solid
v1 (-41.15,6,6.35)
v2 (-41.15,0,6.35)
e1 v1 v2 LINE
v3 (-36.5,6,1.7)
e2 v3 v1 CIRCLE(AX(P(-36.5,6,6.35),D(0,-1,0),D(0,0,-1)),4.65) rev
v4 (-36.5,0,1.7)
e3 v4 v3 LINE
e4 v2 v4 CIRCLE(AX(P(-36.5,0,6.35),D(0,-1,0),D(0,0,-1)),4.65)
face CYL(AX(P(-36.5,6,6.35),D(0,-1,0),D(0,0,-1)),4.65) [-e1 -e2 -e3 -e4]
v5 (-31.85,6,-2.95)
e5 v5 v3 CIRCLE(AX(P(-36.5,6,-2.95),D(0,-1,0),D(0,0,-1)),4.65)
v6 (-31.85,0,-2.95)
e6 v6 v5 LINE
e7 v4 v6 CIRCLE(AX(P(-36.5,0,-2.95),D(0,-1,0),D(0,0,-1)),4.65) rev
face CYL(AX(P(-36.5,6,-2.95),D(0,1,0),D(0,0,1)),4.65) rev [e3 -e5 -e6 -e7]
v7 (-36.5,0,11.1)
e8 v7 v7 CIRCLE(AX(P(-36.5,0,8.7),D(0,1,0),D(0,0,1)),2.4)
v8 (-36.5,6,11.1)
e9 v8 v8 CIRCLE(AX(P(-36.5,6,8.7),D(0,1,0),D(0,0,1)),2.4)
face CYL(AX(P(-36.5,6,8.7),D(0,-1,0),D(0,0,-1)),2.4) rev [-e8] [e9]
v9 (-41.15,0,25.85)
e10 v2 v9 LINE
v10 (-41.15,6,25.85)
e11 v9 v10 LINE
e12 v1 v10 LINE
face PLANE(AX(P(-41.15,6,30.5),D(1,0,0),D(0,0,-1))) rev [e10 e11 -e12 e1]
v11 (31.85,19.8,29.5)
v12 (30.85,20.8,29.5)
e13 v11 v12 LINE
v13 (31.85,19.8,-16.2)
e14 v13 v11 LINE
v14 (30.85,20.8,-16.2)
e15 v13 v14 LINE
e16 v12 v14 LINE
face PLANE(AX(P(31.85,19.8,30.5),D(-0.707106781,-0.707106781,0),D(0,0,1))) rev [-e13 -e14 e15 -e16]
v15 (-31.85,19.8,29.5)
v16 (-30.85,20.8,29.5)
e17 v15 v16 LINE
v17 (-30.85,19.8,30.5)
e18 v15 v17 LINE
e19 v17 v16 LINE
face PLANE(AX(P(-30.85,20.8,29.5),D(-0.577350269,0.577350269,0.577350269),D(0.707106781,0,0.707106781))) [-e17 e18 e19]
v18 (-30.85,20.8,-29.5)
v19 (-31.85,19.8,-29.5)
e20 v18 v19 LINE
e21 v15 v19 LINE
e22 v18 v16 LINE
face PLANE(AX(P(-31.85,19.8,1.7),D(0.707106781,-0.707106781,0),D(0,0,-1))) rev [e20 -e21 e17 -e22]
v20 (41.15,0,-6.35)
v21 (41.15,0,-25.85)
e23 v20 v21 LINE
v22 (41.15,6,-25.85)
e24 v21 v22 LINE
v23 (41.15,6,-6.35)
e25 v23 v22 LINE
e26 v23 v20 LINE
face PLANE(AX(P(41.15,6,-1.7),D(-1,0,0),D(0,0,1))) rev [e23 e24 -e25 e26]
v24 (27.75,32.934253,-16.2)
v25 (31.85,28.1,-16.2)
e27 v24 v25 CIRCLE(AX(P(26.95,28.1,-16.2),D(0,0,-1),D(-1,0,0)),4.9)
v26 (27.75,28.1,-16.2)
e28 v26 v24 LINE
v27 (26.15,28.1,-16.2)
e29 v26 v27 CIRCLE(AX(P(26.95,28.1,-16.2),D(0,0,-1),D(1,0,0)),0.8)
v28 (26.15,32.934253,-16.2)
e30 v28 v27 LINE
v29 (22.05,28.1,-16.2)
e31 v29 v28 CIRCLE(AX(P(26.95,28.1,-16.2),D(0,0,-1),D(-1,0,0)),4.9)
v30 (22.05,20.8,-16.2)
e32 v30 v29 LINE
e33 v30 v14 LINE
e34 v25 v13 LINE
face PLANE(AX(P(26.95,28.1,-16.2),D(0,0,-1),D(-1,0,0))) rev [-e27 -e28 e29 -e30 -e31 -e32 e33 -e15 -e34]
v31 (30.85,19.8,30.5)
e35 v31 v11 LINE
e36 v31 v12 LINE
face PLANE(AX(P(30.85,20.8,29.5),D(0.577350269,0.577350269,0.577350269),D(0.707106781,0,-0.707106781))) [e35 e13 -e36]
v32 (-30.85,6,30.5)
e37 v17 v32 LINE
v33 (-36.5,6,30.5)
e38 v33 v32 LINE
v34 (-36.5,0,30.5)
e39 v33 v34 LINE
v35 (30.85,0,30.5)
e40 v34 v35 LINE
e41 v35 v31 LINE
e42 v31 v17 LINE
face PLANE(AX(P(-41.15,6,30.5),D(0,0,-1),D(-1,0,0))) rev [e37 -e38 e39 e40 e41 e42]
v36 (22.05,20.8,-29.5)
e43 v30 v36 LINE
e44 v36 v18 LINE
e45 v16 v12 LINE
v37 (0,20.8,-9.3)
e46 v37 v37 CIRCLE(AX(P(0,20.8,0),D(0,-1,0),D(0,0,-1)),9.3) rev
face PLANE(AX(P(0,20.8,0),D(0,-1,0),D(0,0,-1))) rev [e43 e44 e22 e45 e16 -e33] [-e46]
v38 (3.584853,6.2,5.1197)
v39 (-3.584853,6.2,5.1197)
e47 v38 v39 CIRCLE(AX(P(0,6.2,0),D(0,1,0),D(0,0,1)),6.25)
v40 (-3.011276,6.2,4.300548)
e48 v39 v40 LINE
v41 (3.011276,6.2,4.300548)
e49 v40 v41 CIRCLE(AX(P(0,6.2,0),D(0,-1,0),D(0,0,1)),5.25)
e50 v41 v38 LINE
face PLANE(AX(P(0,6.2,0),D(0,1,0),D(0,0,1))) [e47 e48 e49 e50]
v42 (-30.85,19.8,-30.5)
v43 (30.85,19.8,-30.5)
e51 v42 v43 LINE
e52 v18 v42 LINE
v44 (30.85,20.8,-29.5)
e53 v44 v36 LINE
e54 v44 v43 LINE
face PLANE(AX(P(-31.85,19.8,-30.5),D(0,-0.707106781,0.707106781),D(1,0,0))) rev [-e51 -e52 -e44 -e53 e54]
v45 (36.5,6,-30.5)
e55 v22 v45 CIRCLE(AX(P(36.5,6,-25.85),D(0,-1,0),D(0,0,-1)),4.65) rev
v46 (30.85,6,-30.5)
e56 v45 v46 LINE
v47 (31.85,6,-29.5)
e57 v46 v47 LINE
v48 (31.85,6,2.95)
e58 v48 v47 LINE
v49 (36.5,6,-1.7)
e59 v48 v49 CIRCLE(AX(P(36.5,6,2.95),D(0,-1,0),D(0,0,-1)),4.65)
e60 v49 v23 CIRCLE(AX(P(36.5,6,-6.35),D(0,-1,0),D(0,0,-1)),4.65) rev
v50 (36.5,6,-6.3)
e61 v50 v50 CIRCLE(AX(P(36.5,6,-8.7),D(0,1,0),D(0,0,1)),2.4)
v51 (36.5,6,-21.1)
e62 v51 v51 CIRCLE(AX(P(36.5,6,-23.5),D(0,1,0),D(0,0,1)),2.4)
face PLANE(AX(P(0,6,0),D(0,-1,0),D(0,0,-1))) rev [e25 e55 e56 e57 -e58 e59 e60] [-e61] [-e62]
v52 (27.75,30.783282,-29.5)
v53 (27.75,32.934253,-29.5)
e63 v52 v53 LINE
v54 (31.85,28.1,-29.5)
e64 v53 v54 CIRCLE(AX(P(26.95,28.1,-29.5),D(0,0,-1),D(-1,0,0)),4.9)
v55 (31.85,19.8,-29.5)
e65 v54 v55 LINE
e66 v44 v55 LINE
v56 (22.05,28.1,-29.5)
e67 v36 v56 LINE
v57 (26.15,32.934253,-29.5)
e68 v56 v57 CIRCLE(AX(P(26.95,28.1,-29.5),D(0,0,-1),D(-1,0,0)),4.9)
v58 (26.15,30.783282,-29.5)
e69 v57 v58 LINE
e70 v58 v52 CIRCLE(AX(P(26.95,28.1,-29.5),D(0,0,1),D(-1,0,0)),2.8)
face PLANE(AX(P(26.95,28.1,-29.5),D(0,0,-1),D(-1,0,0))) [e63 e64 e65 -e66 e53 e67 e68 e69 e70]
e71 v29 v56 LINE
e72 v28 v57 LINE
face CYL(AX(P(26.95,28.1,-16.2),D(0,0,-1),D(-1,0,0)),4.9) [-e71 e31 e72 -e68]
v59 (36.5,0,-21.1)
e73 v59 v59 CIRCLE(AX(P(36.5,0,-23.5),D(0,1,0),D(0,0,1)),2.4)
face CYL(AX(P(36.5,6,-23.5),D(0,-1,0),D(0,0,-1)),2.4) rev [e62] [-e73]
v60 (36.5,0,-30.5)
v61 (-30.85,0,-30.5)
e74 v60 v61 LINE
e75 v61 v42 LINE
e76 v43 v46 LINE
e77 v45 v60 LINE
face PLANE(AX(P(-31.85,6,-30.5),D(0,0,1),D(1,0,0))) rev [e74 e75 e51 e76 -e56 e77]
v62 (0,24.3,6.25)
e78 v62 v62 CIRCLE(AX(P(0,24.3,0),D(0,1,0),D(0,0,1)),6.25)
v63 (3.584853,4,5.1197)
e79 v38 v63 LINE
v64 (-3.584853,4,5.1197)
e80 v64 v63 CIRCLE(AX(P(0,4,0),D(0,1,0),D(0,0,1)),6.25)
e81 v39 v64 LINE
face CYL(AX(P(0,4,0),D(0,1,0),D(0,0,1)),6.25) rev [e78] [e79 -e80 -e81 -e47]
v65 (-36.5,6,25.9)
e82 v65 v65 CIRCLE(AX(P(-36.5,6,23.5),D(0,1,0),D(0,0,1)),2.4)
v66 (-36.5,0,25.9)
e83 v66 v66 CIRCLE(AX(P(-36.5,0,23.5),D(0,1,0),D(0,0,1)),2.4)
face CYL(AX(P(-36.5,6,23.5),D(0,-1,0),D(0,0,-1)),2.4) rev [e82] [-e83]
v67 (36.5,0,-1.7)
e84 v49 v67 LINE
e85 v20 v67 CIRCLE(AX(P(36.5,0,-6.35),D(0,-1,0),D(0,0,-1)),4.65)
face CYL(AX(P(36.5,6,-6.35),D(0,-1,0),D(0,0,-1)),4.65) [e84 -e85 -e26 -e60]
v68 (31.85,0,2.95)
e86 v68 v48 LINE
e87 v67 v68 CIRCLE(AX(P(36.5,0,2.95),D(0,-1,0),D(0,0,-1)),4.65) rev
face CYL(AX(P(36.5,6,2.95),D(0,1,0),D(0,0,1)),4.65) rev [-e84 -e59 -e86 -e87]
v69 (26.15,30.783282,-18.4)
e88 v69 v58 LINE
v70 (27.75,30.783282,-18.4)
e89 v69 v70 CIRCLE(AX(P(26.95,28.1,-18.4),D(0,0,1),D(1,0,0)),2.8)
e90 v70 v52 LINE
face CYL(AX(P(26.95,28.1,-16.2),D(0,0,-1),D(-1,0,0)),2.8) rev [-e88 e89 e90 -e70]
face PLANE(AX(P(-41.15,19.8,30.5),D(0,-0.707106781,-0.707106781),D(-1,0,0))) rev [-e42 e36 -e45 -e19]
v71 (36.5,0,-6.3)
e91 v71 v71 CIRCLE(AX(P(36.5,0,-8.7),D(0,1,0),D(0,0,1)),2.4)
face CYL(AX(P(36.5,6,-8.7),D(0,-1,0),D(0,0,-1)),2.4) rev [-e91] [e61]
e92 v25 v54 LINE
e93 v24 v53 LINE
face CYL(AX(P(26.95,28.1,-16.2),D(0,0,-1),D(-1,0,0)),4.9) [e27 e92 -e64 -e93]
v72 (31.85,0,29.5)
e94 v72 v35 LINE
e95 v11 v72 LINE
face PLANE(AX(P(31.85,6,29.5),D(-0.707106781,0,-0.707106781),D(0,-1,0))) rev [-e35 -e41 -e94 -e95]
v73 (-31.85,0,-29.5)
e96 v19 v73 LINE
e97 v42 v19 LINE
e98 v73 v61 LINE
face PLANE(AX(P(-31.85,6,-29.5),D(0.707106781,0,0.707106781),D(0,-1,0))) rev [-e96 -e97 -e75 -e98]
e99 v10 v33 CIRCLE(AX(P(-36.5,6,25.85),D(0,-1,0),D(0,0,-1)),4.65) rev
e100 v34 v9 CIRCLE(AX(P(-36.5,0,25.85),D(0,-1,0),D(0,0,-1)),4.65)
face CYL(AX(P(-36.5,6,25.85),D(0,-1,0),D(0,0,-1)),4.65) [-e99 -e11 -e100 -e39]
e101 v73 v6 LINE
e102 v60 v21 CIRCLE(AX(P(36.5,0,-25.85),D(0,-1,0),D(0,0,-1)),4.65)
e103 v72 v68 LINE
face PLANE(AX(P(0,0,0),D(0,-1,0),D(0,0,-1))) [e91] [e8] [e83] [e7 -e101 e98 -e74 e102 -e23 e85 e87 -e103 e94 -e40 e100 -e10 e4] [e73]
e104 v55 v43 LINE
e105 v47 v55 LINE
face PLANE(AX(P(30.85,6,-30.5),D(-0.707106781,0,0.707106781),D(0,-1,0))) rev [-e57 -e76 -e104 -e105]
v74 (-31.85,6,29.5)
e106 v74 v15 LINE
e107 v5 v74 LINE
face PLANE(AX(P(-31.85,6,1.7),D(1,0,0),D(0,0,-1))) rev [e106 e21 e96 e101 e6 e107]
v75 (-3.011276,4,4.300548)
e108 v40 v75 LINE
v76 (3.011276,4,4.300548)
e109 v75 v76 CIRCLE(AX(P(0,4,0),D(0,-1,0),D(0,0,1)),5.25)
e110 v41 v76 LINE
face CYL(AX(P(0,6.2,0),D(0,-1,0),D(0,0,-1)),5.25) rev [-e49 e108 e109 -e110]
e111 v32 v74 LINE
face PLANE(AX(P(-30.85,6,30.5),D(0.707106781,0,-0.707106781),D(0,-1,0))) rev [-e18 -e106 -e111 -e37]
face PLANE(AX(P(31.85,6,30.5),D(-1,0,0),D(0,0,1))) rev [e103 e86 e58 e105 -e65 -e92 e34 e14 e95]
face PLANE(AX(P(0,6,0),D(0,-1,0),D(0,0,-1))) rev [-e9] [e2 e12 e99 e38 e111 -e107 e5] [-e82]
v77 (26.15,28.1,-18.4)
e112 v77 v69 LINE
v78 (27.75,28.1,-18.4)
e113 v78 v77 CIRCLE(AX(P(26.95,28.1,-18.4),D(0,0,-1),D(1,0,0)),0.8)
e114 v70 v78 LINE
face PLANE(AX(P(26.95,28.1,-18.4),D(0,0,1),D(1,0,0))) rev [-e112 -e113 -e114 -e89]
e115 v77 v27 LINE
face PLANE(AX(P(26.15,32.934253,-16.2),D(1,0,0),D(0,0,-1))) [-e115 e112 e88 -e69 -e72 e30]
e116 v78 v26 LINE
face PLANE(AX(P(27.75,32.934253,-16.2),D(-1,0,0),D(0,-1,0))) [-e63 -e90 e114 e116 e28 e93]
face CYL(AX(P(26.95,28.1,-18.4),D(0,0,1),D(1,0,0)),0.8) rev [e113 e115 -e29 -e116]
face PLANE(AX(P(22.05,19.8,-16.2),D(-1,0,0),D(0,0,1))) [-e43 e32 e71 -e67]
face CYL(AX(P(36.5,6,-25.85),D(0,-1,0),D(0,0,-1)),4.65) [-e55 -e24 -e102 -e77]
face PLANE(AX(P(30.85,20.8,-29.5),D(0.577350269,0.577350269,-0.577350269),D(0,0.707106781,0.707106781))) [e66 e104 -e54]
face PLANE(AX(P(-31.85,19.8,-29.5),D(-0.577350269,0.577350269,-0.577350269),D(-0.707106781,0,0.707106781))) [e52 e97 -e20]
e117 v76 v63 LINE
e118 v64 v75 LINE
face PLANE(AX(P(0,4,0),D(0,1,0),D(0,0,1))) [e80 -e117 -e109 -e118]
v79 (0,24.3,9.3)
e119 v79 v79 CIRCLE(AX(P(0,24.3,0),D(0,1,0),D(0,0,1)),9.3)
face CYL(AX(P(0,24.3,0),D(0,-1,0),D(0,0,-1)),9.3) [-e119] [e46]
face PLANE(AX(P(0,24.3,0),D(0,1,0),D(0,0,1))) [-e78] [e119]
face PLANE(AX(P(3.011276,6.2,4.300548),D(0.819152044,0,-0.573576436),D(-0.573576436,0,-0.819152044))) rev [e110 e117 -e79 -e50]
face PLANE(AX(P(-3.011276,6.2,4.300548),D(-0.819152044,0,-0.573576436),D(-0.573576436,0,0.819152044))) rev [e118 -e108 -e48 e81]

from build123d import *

# Parameters (mm, degrees)
ESBO_O1_R                = 2.4
RESSALTO_EXTRUS_O1_DEPTH = 6
ESBO_O2_W                = 63.7
ESBO_O2_H                = 61
RESSALTO_EXTRUS_O2_DEPTH = 14.8
CHANFRO1_SIZE            = 1
ESBO_O3_R                = 6.25
CORTE_EXTRUS_O1_DEPTH    = 16.8
FILETE1_R                = 4.65
RESSALTO_EXTRUS_O4_DEPTH = 13.3
RESSALTO_EXTRUS_O5_START = -2.2
RESSALTO_EXTRUS_O5_DEPTH = 2.2
RESSALTO_EXTRUS_O6_START = 2.2
RESSALTO_EXTRUS_O6_DEPTH = 2.2
RESSALTO_EXTRUS_O7_START = 3.5
ESBO_O7_R                = 9.3
ESBO_O7_R_2              = 6.25
RESSALTO_EXTRUS_O7_DEPTH = 3.5


with BuildPart() as part:
    # Esboço1 → Ressalto-extrusão1 (new body)
    with BuildSketch(Plane(origin=(0, 0, 0), x_dir=(1, 0, 0), z_dir=(0, 1, 0))):
        Polygon((-41.15, -1.7), (-31.85, -1.7), (-31.85, 30.5), (41.15, 30.5), (41.15, 1.7), (31.85, 1.7), (31.85, -30.5), (-41.15, -30.5), align=None)
        with Locations(Location((-36.5, -8.7, 0), (0, 0, 270))):
            Circle(ESBO_O1_R, mode=Mode.SUBTRACT)
        with Locations(Location((-36.5, -23.5, 0), (0, 0, 270))):
            Circle(ESBO_O1_R, mode=Mode.SUBTRACT)
        with Locations(Location((36.5, 8.7, 0), (0, 0, 270))):
            Circle(ESBO_O1_R, mode=Mode.SUBTRACT)
        with Locations(Location((36.5, 23.5, 0), (0, 0, 270))):
            Circle(ESBO_O1_R, mode=Mode.SUBTRACT)
    extrude(amount=RESSALTO_EXTRUS_O1_DEPTH)

    # Esboço2 → Ressalto-extrusão2 (add)
    with BuildSketch(Plane(origin=(0, 6, 0), x_dir=(1, 0, 0), z_dir=(0, 1, 0))):
        Rectangle(ESBO_O2_W, ESBO_O2_H)
    extrude(amount=RESSALTO_EXTRUS_O2_DEPTH)

    # Chanfro1
    chanfro1_edges = [part.edges().sort_by_distance(p)[0] for p in [
        (31.85, 10.4, 30.5),
        (-31.85, 10.4, -30.5),
        (0, 20.8, -30.5),
        (31.85, 13.4, -30.5),
        (31.85, 20.8, 0),
        (0, 20.8, 30.5),
        (-31.85, 13.4, 30.5),
        (-31.85, 20.8, 0),
    ]]
    chamfer(chanfro1_edges, length=CHANFRO1_SIZE)

    # Esboço3 → Corte-extrusão1 (cut)
    with BuildSketch(Plane(origin=(0, 20.8, 0), x_dir=(1, 0, 0), z_dir=(0, 1, 0))):
        with Locations(Location((0, 0, 0), (0, 0, 270))):
            Circle(ESBO_O3_R)
    extrude(amount=-CORTE_EXTRUS_O1_DEPTH, mode=Mode.SUBTRACT)

    # Filete1
    filete1_edges = [part.edges().sort_by_distance(p)[0] for p in [
        (41.15, 3, -30.5),
        (41.15, 3, -1.7),
        (31.85, 3, -1.7),
        (-31.85, 3, 1.7),
        (-41.15, 3, 1.7),
        (-41.15, 3, 30.5),
    ]]
    fillet(filete1_edges, radius=FILETE1_R - 0.0001)  # a hair under: the kernel refuses the full size

    # Esboço4 → Ressalto-extrusão4 (add)
    with BuildSketch(Plane(origin=(0, 0, -29.5), x_dir=(-1, 0, 0), z_dir=(0, 0, -1))):
        with BuildLine():
            Line((-31.85, 19.8), (-22.05, 19.8))
            Line((-22.05, 19.8), (-22.05, 28.1))
            ThreePointArc((-22.05, 28.1), (-23.213022612, 31.269384798), (-26.15, 32.934252786))
            Line((-26.15, 32.934252786), (-26.15, 30.783281573))
            ThreePointArc((-26.15, 30.783281573), (-26.95, 25.3), (-27.75, 30.783281573))
            Line((-27.75, 30.783281573), (-27.75, 32.934252786))
            ThreePointArc((-27.75, 32.934252786), (-30.686977388, 31.269384798), (-31.85, 28.1))
            Line((-31.85, 28.1), (-31.85, 19.8))
        make_face()
    extrude(amount=-RESSALTO_EXTRUS_O4_DEPTH)

    # Esboço5 → Ressalto-extrusão5 (add)
    with BuildSketch(Plane.XY.offset(-16.2).offset(RESSALTO_EXTRUS_O5_START)):
        with BuildLine():
            Line((26.15, 30.783281573), (26.15, 28.1))
            ThreePointArc((26.15, 28.1), (26.95, 27.3), (27.75, 28.1))
            Line((27.75, 28.1), (27.75, 30.783281573))
            ThreePointArc((27.75, 30.783281573), (26.95, 25.3), (26.15, 30.783281573))
        make_face()
    extrude(amount=RESSALTO_EXTRUS_O5_DEPTH)

    # Esboço6 → Ressalto-extrusão6 (add)
    with BuildSketch(Plane(origin=(0, 4, 0), x_dir=(1, 0, 0), z_dir=(0, 1, 0)).offset(RESSALTO_EXTRUS_O6_START)):
        with BuildLine():
            Line((-3.011276291, -4.300548233), (-3.584852727, -5.119700277))
            ThreePointArc((-3.584852727, -5.119700277), (0, 6.25), (3.584852727, -5.119700277))
            Line((3.584852727, -5.119700277), (3.011276291, -4.300548233))
            ThreePointArc((3.011276291, -4.300548233), (0, 5.25), (-3.011276291, -4.300548233))
        make_face()
    extrude(amount=-RESSALTO_EXTRUS_O6_DEPTH)

    # Esboço7 → Ressalto-extrusão7 (add)
    with BuildSketch(Plane(origin=(0, 20.8, 0), x_dir=(1, 0, 0), z_dir=(0, 1, 0)).offset(RESSALTO_EXTRUS_O7_START)):
        with Locations(Location((0, 0, 0), (0, 0, 90))):
            Circle(ESBO_O7_R)
        with Locations(Location((0, 0, 0), (0, 0, 270))):
            Circle(ESBO_O7_R_2, mode=Mode.SUBTRACT)
    extrude(amount=-RESSALTO_EXTRUS_O7_DEPTH)


solid = part.part
